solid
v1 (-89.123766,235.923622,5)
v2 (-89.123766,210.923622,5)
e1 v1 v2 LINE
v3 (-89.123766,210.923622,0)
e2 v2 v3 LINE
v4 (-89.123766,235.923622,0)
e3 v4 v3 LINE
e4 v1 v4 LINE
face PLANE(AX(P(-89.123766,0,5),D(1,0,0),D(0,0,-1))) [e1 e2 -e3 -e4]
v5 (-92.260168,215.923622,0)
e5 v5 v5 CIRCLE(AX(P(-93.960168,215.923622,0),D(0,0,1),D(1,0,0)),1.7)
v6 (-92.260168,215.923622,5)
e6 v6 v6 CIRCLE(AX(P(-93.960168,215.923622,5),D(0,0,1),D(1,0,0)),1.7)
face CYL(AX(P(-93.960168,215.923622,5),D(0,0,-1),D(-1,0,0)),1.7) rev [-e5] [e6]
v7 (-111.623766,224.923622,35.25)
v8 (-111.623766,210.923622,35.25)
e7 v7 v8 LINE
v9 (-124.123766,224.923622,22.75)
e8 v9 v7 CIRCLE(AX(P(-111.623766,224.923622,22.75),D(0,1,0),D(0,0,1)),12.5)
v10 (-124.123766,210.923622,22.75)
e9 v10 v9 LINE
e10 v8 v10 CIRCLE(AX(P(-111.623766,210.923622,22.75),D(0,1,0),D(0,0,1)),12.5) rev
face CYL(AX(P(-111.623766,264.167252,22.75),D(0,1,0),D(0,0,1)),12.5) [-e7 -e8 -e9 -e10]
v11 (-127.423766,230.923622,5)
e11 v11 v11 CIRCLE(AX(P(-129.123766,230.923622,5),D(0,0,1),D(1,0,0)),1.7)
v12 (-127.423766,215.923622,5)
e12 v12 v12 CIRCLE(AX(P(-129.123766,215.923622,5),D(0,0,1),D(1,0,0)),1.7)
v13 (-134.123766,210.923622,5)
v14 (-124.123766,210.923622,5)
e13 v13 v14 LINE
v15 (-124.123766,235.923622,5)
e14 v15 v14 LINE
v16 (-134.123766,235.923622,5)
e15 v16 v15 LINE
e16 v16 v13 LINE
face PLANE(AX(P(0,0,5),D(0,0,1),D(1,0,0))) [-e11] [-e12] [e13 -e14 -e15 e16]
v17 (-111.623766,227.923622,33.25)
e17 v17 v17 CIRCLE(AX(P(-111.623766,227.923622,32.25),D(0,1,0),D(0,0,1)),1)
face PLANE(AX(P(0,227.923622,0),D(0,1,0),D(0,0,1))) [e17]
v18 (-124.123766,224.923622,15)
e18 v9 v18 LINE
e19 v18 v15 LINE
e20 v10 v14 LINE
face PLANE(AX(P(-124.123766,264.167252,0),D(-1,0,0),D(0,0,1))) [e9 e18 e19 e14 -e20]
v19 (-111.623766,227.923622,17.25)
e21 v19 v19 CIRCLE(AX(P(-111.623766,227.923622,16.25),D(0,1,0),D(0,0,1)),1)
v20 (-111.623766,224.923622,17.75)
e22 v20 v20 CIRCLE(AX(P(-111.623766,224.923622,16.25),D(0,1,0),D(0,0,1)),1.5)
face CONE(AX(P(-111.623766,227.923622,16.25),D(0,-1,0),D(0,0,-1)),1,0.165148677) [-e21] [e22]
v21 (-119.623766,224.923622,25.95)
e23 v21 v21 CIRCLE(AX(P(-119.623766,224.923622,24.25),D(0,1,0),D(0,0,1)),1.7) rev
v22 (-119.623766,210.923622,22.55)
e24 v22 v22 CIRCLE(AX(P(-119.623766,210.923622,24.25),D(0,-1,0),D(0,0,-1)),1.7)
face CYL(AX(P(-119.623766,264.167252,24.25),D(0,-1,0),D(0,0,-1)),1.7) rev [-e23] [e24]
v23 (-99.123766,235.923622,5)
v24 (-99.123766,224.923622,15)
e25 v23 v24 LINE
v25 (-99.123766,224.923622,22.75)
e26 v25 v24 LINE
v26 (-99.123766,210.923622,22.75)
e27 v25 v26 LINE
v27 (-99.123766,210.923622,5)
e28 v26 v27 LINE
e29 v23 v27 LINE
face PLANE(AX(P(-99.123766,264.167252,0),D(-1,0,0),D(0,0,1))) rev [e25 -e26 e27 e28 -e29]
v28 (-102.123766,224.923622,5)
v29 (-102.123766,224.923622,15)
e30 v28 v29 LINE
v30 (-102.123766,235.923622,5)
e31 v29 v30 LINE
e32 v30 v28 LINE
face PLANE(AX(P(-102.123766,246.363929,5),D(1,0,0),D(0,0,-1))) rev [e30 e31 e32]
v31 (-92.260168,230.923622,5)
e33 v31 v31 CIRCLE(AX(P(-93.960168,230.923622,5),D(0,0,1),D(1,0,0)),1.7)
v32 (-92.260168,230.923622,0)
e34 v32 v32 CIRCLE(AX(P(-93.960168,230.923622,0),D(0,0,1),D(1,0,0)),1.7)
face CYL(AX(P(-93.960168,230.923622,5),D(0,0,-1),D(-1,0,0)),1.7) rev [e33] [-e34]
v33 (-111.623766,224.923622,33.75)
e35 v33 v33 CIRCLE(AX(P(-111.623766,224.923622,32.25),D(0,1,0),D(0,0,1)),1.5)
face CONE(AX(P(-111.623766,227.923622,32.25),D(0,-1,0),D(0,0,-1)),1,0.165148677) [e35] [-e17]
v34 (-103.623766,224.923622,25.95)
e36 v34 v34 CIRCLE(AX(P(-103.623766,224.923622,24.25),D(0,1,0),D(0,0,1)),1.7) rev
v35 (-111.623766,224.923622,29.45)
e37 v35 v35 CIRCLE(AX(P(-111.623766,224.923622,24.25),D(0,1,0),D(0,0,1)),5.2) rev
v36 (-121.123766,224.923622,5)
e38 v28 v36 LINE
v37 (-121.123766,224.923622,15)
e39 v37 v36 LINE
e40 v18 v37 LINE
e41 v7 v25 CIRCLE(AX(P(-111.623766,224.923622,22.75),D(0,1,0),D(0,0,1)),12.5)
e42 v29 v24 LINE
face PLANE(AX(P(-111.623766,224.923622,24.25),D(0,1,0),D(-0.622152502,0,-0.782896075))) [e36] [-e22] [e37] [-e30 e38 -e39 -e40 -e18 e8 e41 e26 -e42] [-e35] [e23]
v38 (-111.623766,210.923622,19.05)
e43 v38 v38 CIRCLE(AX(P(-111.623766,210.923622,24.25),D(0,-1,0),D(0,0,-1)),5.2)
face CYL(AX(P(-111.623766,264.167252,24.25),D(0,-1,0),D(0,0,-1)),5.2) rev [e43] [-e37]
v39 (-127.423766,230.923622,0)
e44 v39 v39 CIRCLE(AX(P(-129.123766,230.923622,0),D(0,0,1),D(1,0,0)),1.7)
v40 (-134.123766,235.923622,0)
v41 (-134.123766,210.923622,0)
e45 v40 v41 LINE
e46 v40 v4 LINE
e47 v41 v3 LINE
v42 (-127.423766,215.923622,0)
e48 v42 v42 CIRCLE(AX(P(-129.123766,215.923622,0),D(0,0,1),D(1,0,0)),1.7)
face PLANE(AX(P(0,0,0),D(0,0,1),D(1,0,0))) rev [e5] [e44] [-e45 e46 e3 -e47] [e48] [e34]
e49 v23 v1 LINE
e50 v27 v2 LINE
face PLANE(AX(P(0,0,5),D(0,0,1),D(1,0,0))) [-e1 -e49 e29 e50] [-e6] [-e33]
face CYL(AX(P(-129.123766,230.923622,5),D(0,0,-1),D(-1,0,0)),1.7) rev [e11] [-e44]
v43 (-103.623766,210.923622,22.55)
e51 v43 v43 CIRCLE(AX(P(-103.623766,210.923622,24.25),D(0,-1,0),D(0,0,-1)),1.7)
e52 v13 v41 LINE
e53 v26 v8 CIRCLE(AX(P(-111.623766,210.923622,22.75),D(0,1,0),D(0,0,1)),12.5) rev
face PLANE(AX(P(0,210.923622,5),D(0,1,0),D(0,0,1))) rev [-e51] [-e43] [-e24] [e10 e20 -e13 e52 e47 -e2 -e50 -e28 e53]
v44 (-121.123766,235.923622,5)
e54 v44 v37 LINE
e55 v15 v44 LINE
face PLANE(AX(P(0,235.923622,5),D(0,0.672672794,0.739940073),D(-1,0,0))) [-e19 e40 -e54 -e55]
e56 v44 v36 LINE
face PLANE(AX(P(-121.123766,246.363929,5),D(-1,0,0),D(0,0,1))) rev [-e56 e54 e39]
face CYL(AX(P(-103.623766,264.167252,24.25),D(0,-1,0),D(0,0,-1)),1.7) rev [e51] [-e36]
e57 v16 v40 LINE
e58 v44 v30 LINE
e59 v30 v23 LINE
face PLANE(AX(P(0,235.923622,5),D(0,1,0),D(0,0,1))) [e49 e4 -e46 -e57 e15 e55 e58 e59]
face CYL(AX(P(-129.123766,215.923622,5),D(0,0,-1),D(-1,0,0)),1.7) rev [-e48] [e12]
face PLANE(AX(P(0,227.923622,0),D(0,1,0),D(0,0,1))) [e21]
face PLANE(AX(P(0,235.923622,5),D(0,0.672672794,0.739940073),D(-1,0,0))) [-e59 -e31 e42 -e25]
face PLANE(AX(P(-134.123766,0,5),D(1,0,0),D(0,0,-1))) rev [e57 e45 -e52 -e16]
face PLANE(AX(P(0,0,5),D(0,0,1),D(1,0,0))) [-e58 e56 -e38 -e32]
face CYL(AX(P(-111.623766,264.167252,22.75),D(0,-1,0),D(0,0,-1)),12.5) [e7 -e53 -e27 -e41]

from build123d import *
from OCP.BRepFilletAPI import BRepFilletAPI_MakeChamfer

# Parameters (mm, degrees)
SKETCH1_R           = 1.7
BOSS_EXTRUDE1_DEPTH = 5
SKETCH2_R           = 1.7
BOSS_EXTRUDE2_DEPTH = 14
SKETCH3_R           = 1.5
BOSS_EXTRUDE3_DEPTH = 3
CHAMFER1_SIZE       = 3
CHAMFER1_SIZE_2     = 0.5
FILLET1_R           = 12.5
SKETCH4_W           = 3
SKETCH4_H           = 10
BOSS_EXTRUDE4_DEPTH = 11
CHAMFER2_SIZE       = 10
CHAMFER2_SIZE_2     = 11


with BuildPart() as part:
    # Sketch1 → Boss-Extrude1 (new body)
    with BuildSketch(Plane.XY):
        Polygon((-93.960167873, 235.92362241), (-129.123766163, 235.92362241), (-134.123766163, 235.92362241), (-134.123766163, 210.92362241), (-129.123766163, 210.92362241), (-93.960167873, 210.92362241), (-89.123766163, 210.92362241), (-89.123766163, 235.92362241), align=None)
        with Locations((-93.960167873, 215.92362241)):
            Circle(SKETCH1_R, mode=Mode.SUBTRACT)
        with Locations((-93.960167873, 230.92362241)):
            Circle(SKETCH1_R, mode=Mode.SUBTRACT)
        with Locations((-129.123766163, 215.92362241)):
            Circle(SKETCH1_R, mode=Mode.SUBTRACT)
        with Locations((-129.123766163, 230.92362241)):
            Circle(SKETCH1_R, mode=Mode.SUBTRACT)
    extrude(amount=BOSS_EXTRUDE1_DEPTH)

    # Sketch2 → Boss-Extrude2 (add)
    # profile 1 of 2: a face of its own
    with BuildSketch(Plane.XZ.offset(-210.92362241)):
        with BuildLine():
            Line((-111.623766166, 19.049999998), (-111.623766166, 5))
            Line((-111.623766166, 5), (-99.123766166, 5))
            Line((-99.123766166, 5), (-99.123766166, 35.249999998))
            Line((-99.123766166, 35.249999998), (-111.623766166, 35.249999998))
            Line((-111.623766166, 35.249999998), (-111.623766166, 29.449999998))
            ThreePointArc((-111.623766166, 29.449999998), (-107.946810904, 27.92695526), (-106.423766166, 24.249999998))
            ThreePointArc((-106.423766166, 24.249999998), (-107.946810904, 20.573044736), (-111.623766166, 19.049999998))
        make_face()
        with Locations(Location((-103.623766166, 24.249999998, 0), (0, 0, 270))):
            Circle(SKETCH2_R, mode=Mode.SUBTRACT)
    # profile 2 of 2: a face of its own
    with BuildSketch(Plane.XZ.offset(-210.92362241)):
        with BuildLine():
            Line((-124.123766166, 5), (-111.623766166, 5))
            Line((-111.623766166, 5), (-111.623766166, 19.049999998))
            ThreePointArc((-111.623766166, 19.049999998), (-116.823766166, 24.249999998), (-111.623766166, 29.449999998))
            Line((-111.623766166, 29.449999998), (-111.623766166, 35.249999998))
            Line((-111.623766166, 35.249999998), (-124.123766166, 35.249999998))
            Line((-124.123766166, 35.249999998), (-124.123766166, 5))
        make_face()
        with Locations(Location((-119.623766166, 24.249999998, 0), (0, 0, 270))):
            Circle(SKETCH2_R, mode=Mode.SUBTRACT)
    extrude(amount=-BOSS_EXTRUDE2_DEPTH)

    # Sketch3 → Boss-Extrude3 (add)
    with BuildSketch(Plane(origin=(0, 224.92362241, 0), x_dir=(1, 0, 0), z_dir=(0, 1, 0))):
        with Locations(Location((-111.623766166, -16.249999998, 0), (0, 0, 270))):
            Circle(SKETCH3_R)
        with Locations(Location((-111.623766166, -32.249999998, 0), (0, 0, 270))):
            Circle(SKETCH3_R)
    extrude(amount=BOSS_EXTRUDE3_DEPTH)

    # Chamfer1
    chamfer1_edges_1 = [part.edges().sort_by_distance(p)[0] for p in [
        (-111.623766166, 227.92362241, 14.749999998),
    ]]
    chamfer1_side_1 = [part.faces().sort_by_distance(p)[0] for p in [
        (-111.623766166, 227.91362241, 14.749999998),
    ]]
    chamfer1_edges_2 = [part.edges().sort_by_distance(p)[0] for p in [
        (-111.623766166, 227.92362241, 30.749999998),
    ]]
    chamfer1_side_2 = [part.faces().sort_by_distance(p)[0] for p in [
        (-111.623766166, 227.91362241, 30.749999998),
    ]]
    chamfer1 = BRepFilletAPI_MakeChamfer(part.part.solid().wrapped)
    for e in chamfer1_edges_1:
        chamfer1.Add(CHAMFER1_SIZE - 0.0001, CHAMFER1_SIZE_2 - 0.0001, e.wrapped, chamfer1_side_1[0].wrapped)
    for e in chamfer1_edges_2:
        chamfer1.Add(CHAMFER1_SIZE - 0.0001, CHAMFER1_SIZE_2 - 0.0001, e.wrapped, chamfer1_side_2[0].wrapped)
    add(Compound.cast(chamfer1.Shape()), mode=Mode.REPLACE)  # a hair under: the kernel refuses the full size

    # Fillet1
    fillet1_edges = [part.edges().sort_by_distance(p)[0] for p in [
        (-99.123766166, 217.92362241, 35.249999998),
        (-124.123766166, 217.92362241, 35.249999998),
    ]]
    fillet(fillet1_edges, radius=FILLET1_R - 0.0001)  # a hair under: the kernel refuses the full size

    # Sketch4 → Boss-Extrude4 (add)
    with BuildSketch(Plane(origin=(0, 224.92362241, 0), x_dir=(1, 0, 0), z_dir=(0, 1, 0))):
        with Locations((-122.623766166, -10)):
            Rectangle(SKETCH4_W, SKETCH4_H)
        with Locations((-100.623766166, -10)):
            Rectangle(SKETCH4_W, SKETCH4_H)
    extrude(amount=BOSS_EXTRUDE4_DEPTH)

    # Chamfer2
    chamfer2_edges_1 = [part.edges().sort_by_distance(p)[0] for p in [
        (-100.623766166, 235.92362241, 15),
    ]]
    chamfer2_side_1 = [part.faces().sort_by_distance(p)[0] for p in [
        (-100.623766166, 235.92362241, 14.8),
    ]]
    chamfer2_edges_2 = [part.edges().sort_by_distance(p)[0] for p in [
        (-122.623766166, 235.92362241, 15),
    ]]
    chamfer2_side_2 = [part.faces().sort_by_distance(p)[0] for p in [
        (-122.623766166, 235.92362241, 14.8),
    ]]
    chamfer2 = BRepFilletAPI_MakeChamfer(part.part.solid().wrapped)
    for e in chamfer2_edges_1:
        chamfer2.Add(CHAMFER2_SIZE - 0.0001, CHAMFER2_SIZE_2 - 0.0001, e.wrapped, chamfer2_side_1[0].wrapped)
    for e in chamfer2_edges_2:
        chamfer2.Add(CHAMFER2_SIZE - 0.0001, CHAMFER2_SIZE_2 - 0.0001, e.wrapped, chamfer2_side_2[0].wrapped)
    add(Compound.cast(chamfer2.Shape()), mode=Mode.REPLACE)  # a hair under: the kernel refuses the full size


solid = part.part
